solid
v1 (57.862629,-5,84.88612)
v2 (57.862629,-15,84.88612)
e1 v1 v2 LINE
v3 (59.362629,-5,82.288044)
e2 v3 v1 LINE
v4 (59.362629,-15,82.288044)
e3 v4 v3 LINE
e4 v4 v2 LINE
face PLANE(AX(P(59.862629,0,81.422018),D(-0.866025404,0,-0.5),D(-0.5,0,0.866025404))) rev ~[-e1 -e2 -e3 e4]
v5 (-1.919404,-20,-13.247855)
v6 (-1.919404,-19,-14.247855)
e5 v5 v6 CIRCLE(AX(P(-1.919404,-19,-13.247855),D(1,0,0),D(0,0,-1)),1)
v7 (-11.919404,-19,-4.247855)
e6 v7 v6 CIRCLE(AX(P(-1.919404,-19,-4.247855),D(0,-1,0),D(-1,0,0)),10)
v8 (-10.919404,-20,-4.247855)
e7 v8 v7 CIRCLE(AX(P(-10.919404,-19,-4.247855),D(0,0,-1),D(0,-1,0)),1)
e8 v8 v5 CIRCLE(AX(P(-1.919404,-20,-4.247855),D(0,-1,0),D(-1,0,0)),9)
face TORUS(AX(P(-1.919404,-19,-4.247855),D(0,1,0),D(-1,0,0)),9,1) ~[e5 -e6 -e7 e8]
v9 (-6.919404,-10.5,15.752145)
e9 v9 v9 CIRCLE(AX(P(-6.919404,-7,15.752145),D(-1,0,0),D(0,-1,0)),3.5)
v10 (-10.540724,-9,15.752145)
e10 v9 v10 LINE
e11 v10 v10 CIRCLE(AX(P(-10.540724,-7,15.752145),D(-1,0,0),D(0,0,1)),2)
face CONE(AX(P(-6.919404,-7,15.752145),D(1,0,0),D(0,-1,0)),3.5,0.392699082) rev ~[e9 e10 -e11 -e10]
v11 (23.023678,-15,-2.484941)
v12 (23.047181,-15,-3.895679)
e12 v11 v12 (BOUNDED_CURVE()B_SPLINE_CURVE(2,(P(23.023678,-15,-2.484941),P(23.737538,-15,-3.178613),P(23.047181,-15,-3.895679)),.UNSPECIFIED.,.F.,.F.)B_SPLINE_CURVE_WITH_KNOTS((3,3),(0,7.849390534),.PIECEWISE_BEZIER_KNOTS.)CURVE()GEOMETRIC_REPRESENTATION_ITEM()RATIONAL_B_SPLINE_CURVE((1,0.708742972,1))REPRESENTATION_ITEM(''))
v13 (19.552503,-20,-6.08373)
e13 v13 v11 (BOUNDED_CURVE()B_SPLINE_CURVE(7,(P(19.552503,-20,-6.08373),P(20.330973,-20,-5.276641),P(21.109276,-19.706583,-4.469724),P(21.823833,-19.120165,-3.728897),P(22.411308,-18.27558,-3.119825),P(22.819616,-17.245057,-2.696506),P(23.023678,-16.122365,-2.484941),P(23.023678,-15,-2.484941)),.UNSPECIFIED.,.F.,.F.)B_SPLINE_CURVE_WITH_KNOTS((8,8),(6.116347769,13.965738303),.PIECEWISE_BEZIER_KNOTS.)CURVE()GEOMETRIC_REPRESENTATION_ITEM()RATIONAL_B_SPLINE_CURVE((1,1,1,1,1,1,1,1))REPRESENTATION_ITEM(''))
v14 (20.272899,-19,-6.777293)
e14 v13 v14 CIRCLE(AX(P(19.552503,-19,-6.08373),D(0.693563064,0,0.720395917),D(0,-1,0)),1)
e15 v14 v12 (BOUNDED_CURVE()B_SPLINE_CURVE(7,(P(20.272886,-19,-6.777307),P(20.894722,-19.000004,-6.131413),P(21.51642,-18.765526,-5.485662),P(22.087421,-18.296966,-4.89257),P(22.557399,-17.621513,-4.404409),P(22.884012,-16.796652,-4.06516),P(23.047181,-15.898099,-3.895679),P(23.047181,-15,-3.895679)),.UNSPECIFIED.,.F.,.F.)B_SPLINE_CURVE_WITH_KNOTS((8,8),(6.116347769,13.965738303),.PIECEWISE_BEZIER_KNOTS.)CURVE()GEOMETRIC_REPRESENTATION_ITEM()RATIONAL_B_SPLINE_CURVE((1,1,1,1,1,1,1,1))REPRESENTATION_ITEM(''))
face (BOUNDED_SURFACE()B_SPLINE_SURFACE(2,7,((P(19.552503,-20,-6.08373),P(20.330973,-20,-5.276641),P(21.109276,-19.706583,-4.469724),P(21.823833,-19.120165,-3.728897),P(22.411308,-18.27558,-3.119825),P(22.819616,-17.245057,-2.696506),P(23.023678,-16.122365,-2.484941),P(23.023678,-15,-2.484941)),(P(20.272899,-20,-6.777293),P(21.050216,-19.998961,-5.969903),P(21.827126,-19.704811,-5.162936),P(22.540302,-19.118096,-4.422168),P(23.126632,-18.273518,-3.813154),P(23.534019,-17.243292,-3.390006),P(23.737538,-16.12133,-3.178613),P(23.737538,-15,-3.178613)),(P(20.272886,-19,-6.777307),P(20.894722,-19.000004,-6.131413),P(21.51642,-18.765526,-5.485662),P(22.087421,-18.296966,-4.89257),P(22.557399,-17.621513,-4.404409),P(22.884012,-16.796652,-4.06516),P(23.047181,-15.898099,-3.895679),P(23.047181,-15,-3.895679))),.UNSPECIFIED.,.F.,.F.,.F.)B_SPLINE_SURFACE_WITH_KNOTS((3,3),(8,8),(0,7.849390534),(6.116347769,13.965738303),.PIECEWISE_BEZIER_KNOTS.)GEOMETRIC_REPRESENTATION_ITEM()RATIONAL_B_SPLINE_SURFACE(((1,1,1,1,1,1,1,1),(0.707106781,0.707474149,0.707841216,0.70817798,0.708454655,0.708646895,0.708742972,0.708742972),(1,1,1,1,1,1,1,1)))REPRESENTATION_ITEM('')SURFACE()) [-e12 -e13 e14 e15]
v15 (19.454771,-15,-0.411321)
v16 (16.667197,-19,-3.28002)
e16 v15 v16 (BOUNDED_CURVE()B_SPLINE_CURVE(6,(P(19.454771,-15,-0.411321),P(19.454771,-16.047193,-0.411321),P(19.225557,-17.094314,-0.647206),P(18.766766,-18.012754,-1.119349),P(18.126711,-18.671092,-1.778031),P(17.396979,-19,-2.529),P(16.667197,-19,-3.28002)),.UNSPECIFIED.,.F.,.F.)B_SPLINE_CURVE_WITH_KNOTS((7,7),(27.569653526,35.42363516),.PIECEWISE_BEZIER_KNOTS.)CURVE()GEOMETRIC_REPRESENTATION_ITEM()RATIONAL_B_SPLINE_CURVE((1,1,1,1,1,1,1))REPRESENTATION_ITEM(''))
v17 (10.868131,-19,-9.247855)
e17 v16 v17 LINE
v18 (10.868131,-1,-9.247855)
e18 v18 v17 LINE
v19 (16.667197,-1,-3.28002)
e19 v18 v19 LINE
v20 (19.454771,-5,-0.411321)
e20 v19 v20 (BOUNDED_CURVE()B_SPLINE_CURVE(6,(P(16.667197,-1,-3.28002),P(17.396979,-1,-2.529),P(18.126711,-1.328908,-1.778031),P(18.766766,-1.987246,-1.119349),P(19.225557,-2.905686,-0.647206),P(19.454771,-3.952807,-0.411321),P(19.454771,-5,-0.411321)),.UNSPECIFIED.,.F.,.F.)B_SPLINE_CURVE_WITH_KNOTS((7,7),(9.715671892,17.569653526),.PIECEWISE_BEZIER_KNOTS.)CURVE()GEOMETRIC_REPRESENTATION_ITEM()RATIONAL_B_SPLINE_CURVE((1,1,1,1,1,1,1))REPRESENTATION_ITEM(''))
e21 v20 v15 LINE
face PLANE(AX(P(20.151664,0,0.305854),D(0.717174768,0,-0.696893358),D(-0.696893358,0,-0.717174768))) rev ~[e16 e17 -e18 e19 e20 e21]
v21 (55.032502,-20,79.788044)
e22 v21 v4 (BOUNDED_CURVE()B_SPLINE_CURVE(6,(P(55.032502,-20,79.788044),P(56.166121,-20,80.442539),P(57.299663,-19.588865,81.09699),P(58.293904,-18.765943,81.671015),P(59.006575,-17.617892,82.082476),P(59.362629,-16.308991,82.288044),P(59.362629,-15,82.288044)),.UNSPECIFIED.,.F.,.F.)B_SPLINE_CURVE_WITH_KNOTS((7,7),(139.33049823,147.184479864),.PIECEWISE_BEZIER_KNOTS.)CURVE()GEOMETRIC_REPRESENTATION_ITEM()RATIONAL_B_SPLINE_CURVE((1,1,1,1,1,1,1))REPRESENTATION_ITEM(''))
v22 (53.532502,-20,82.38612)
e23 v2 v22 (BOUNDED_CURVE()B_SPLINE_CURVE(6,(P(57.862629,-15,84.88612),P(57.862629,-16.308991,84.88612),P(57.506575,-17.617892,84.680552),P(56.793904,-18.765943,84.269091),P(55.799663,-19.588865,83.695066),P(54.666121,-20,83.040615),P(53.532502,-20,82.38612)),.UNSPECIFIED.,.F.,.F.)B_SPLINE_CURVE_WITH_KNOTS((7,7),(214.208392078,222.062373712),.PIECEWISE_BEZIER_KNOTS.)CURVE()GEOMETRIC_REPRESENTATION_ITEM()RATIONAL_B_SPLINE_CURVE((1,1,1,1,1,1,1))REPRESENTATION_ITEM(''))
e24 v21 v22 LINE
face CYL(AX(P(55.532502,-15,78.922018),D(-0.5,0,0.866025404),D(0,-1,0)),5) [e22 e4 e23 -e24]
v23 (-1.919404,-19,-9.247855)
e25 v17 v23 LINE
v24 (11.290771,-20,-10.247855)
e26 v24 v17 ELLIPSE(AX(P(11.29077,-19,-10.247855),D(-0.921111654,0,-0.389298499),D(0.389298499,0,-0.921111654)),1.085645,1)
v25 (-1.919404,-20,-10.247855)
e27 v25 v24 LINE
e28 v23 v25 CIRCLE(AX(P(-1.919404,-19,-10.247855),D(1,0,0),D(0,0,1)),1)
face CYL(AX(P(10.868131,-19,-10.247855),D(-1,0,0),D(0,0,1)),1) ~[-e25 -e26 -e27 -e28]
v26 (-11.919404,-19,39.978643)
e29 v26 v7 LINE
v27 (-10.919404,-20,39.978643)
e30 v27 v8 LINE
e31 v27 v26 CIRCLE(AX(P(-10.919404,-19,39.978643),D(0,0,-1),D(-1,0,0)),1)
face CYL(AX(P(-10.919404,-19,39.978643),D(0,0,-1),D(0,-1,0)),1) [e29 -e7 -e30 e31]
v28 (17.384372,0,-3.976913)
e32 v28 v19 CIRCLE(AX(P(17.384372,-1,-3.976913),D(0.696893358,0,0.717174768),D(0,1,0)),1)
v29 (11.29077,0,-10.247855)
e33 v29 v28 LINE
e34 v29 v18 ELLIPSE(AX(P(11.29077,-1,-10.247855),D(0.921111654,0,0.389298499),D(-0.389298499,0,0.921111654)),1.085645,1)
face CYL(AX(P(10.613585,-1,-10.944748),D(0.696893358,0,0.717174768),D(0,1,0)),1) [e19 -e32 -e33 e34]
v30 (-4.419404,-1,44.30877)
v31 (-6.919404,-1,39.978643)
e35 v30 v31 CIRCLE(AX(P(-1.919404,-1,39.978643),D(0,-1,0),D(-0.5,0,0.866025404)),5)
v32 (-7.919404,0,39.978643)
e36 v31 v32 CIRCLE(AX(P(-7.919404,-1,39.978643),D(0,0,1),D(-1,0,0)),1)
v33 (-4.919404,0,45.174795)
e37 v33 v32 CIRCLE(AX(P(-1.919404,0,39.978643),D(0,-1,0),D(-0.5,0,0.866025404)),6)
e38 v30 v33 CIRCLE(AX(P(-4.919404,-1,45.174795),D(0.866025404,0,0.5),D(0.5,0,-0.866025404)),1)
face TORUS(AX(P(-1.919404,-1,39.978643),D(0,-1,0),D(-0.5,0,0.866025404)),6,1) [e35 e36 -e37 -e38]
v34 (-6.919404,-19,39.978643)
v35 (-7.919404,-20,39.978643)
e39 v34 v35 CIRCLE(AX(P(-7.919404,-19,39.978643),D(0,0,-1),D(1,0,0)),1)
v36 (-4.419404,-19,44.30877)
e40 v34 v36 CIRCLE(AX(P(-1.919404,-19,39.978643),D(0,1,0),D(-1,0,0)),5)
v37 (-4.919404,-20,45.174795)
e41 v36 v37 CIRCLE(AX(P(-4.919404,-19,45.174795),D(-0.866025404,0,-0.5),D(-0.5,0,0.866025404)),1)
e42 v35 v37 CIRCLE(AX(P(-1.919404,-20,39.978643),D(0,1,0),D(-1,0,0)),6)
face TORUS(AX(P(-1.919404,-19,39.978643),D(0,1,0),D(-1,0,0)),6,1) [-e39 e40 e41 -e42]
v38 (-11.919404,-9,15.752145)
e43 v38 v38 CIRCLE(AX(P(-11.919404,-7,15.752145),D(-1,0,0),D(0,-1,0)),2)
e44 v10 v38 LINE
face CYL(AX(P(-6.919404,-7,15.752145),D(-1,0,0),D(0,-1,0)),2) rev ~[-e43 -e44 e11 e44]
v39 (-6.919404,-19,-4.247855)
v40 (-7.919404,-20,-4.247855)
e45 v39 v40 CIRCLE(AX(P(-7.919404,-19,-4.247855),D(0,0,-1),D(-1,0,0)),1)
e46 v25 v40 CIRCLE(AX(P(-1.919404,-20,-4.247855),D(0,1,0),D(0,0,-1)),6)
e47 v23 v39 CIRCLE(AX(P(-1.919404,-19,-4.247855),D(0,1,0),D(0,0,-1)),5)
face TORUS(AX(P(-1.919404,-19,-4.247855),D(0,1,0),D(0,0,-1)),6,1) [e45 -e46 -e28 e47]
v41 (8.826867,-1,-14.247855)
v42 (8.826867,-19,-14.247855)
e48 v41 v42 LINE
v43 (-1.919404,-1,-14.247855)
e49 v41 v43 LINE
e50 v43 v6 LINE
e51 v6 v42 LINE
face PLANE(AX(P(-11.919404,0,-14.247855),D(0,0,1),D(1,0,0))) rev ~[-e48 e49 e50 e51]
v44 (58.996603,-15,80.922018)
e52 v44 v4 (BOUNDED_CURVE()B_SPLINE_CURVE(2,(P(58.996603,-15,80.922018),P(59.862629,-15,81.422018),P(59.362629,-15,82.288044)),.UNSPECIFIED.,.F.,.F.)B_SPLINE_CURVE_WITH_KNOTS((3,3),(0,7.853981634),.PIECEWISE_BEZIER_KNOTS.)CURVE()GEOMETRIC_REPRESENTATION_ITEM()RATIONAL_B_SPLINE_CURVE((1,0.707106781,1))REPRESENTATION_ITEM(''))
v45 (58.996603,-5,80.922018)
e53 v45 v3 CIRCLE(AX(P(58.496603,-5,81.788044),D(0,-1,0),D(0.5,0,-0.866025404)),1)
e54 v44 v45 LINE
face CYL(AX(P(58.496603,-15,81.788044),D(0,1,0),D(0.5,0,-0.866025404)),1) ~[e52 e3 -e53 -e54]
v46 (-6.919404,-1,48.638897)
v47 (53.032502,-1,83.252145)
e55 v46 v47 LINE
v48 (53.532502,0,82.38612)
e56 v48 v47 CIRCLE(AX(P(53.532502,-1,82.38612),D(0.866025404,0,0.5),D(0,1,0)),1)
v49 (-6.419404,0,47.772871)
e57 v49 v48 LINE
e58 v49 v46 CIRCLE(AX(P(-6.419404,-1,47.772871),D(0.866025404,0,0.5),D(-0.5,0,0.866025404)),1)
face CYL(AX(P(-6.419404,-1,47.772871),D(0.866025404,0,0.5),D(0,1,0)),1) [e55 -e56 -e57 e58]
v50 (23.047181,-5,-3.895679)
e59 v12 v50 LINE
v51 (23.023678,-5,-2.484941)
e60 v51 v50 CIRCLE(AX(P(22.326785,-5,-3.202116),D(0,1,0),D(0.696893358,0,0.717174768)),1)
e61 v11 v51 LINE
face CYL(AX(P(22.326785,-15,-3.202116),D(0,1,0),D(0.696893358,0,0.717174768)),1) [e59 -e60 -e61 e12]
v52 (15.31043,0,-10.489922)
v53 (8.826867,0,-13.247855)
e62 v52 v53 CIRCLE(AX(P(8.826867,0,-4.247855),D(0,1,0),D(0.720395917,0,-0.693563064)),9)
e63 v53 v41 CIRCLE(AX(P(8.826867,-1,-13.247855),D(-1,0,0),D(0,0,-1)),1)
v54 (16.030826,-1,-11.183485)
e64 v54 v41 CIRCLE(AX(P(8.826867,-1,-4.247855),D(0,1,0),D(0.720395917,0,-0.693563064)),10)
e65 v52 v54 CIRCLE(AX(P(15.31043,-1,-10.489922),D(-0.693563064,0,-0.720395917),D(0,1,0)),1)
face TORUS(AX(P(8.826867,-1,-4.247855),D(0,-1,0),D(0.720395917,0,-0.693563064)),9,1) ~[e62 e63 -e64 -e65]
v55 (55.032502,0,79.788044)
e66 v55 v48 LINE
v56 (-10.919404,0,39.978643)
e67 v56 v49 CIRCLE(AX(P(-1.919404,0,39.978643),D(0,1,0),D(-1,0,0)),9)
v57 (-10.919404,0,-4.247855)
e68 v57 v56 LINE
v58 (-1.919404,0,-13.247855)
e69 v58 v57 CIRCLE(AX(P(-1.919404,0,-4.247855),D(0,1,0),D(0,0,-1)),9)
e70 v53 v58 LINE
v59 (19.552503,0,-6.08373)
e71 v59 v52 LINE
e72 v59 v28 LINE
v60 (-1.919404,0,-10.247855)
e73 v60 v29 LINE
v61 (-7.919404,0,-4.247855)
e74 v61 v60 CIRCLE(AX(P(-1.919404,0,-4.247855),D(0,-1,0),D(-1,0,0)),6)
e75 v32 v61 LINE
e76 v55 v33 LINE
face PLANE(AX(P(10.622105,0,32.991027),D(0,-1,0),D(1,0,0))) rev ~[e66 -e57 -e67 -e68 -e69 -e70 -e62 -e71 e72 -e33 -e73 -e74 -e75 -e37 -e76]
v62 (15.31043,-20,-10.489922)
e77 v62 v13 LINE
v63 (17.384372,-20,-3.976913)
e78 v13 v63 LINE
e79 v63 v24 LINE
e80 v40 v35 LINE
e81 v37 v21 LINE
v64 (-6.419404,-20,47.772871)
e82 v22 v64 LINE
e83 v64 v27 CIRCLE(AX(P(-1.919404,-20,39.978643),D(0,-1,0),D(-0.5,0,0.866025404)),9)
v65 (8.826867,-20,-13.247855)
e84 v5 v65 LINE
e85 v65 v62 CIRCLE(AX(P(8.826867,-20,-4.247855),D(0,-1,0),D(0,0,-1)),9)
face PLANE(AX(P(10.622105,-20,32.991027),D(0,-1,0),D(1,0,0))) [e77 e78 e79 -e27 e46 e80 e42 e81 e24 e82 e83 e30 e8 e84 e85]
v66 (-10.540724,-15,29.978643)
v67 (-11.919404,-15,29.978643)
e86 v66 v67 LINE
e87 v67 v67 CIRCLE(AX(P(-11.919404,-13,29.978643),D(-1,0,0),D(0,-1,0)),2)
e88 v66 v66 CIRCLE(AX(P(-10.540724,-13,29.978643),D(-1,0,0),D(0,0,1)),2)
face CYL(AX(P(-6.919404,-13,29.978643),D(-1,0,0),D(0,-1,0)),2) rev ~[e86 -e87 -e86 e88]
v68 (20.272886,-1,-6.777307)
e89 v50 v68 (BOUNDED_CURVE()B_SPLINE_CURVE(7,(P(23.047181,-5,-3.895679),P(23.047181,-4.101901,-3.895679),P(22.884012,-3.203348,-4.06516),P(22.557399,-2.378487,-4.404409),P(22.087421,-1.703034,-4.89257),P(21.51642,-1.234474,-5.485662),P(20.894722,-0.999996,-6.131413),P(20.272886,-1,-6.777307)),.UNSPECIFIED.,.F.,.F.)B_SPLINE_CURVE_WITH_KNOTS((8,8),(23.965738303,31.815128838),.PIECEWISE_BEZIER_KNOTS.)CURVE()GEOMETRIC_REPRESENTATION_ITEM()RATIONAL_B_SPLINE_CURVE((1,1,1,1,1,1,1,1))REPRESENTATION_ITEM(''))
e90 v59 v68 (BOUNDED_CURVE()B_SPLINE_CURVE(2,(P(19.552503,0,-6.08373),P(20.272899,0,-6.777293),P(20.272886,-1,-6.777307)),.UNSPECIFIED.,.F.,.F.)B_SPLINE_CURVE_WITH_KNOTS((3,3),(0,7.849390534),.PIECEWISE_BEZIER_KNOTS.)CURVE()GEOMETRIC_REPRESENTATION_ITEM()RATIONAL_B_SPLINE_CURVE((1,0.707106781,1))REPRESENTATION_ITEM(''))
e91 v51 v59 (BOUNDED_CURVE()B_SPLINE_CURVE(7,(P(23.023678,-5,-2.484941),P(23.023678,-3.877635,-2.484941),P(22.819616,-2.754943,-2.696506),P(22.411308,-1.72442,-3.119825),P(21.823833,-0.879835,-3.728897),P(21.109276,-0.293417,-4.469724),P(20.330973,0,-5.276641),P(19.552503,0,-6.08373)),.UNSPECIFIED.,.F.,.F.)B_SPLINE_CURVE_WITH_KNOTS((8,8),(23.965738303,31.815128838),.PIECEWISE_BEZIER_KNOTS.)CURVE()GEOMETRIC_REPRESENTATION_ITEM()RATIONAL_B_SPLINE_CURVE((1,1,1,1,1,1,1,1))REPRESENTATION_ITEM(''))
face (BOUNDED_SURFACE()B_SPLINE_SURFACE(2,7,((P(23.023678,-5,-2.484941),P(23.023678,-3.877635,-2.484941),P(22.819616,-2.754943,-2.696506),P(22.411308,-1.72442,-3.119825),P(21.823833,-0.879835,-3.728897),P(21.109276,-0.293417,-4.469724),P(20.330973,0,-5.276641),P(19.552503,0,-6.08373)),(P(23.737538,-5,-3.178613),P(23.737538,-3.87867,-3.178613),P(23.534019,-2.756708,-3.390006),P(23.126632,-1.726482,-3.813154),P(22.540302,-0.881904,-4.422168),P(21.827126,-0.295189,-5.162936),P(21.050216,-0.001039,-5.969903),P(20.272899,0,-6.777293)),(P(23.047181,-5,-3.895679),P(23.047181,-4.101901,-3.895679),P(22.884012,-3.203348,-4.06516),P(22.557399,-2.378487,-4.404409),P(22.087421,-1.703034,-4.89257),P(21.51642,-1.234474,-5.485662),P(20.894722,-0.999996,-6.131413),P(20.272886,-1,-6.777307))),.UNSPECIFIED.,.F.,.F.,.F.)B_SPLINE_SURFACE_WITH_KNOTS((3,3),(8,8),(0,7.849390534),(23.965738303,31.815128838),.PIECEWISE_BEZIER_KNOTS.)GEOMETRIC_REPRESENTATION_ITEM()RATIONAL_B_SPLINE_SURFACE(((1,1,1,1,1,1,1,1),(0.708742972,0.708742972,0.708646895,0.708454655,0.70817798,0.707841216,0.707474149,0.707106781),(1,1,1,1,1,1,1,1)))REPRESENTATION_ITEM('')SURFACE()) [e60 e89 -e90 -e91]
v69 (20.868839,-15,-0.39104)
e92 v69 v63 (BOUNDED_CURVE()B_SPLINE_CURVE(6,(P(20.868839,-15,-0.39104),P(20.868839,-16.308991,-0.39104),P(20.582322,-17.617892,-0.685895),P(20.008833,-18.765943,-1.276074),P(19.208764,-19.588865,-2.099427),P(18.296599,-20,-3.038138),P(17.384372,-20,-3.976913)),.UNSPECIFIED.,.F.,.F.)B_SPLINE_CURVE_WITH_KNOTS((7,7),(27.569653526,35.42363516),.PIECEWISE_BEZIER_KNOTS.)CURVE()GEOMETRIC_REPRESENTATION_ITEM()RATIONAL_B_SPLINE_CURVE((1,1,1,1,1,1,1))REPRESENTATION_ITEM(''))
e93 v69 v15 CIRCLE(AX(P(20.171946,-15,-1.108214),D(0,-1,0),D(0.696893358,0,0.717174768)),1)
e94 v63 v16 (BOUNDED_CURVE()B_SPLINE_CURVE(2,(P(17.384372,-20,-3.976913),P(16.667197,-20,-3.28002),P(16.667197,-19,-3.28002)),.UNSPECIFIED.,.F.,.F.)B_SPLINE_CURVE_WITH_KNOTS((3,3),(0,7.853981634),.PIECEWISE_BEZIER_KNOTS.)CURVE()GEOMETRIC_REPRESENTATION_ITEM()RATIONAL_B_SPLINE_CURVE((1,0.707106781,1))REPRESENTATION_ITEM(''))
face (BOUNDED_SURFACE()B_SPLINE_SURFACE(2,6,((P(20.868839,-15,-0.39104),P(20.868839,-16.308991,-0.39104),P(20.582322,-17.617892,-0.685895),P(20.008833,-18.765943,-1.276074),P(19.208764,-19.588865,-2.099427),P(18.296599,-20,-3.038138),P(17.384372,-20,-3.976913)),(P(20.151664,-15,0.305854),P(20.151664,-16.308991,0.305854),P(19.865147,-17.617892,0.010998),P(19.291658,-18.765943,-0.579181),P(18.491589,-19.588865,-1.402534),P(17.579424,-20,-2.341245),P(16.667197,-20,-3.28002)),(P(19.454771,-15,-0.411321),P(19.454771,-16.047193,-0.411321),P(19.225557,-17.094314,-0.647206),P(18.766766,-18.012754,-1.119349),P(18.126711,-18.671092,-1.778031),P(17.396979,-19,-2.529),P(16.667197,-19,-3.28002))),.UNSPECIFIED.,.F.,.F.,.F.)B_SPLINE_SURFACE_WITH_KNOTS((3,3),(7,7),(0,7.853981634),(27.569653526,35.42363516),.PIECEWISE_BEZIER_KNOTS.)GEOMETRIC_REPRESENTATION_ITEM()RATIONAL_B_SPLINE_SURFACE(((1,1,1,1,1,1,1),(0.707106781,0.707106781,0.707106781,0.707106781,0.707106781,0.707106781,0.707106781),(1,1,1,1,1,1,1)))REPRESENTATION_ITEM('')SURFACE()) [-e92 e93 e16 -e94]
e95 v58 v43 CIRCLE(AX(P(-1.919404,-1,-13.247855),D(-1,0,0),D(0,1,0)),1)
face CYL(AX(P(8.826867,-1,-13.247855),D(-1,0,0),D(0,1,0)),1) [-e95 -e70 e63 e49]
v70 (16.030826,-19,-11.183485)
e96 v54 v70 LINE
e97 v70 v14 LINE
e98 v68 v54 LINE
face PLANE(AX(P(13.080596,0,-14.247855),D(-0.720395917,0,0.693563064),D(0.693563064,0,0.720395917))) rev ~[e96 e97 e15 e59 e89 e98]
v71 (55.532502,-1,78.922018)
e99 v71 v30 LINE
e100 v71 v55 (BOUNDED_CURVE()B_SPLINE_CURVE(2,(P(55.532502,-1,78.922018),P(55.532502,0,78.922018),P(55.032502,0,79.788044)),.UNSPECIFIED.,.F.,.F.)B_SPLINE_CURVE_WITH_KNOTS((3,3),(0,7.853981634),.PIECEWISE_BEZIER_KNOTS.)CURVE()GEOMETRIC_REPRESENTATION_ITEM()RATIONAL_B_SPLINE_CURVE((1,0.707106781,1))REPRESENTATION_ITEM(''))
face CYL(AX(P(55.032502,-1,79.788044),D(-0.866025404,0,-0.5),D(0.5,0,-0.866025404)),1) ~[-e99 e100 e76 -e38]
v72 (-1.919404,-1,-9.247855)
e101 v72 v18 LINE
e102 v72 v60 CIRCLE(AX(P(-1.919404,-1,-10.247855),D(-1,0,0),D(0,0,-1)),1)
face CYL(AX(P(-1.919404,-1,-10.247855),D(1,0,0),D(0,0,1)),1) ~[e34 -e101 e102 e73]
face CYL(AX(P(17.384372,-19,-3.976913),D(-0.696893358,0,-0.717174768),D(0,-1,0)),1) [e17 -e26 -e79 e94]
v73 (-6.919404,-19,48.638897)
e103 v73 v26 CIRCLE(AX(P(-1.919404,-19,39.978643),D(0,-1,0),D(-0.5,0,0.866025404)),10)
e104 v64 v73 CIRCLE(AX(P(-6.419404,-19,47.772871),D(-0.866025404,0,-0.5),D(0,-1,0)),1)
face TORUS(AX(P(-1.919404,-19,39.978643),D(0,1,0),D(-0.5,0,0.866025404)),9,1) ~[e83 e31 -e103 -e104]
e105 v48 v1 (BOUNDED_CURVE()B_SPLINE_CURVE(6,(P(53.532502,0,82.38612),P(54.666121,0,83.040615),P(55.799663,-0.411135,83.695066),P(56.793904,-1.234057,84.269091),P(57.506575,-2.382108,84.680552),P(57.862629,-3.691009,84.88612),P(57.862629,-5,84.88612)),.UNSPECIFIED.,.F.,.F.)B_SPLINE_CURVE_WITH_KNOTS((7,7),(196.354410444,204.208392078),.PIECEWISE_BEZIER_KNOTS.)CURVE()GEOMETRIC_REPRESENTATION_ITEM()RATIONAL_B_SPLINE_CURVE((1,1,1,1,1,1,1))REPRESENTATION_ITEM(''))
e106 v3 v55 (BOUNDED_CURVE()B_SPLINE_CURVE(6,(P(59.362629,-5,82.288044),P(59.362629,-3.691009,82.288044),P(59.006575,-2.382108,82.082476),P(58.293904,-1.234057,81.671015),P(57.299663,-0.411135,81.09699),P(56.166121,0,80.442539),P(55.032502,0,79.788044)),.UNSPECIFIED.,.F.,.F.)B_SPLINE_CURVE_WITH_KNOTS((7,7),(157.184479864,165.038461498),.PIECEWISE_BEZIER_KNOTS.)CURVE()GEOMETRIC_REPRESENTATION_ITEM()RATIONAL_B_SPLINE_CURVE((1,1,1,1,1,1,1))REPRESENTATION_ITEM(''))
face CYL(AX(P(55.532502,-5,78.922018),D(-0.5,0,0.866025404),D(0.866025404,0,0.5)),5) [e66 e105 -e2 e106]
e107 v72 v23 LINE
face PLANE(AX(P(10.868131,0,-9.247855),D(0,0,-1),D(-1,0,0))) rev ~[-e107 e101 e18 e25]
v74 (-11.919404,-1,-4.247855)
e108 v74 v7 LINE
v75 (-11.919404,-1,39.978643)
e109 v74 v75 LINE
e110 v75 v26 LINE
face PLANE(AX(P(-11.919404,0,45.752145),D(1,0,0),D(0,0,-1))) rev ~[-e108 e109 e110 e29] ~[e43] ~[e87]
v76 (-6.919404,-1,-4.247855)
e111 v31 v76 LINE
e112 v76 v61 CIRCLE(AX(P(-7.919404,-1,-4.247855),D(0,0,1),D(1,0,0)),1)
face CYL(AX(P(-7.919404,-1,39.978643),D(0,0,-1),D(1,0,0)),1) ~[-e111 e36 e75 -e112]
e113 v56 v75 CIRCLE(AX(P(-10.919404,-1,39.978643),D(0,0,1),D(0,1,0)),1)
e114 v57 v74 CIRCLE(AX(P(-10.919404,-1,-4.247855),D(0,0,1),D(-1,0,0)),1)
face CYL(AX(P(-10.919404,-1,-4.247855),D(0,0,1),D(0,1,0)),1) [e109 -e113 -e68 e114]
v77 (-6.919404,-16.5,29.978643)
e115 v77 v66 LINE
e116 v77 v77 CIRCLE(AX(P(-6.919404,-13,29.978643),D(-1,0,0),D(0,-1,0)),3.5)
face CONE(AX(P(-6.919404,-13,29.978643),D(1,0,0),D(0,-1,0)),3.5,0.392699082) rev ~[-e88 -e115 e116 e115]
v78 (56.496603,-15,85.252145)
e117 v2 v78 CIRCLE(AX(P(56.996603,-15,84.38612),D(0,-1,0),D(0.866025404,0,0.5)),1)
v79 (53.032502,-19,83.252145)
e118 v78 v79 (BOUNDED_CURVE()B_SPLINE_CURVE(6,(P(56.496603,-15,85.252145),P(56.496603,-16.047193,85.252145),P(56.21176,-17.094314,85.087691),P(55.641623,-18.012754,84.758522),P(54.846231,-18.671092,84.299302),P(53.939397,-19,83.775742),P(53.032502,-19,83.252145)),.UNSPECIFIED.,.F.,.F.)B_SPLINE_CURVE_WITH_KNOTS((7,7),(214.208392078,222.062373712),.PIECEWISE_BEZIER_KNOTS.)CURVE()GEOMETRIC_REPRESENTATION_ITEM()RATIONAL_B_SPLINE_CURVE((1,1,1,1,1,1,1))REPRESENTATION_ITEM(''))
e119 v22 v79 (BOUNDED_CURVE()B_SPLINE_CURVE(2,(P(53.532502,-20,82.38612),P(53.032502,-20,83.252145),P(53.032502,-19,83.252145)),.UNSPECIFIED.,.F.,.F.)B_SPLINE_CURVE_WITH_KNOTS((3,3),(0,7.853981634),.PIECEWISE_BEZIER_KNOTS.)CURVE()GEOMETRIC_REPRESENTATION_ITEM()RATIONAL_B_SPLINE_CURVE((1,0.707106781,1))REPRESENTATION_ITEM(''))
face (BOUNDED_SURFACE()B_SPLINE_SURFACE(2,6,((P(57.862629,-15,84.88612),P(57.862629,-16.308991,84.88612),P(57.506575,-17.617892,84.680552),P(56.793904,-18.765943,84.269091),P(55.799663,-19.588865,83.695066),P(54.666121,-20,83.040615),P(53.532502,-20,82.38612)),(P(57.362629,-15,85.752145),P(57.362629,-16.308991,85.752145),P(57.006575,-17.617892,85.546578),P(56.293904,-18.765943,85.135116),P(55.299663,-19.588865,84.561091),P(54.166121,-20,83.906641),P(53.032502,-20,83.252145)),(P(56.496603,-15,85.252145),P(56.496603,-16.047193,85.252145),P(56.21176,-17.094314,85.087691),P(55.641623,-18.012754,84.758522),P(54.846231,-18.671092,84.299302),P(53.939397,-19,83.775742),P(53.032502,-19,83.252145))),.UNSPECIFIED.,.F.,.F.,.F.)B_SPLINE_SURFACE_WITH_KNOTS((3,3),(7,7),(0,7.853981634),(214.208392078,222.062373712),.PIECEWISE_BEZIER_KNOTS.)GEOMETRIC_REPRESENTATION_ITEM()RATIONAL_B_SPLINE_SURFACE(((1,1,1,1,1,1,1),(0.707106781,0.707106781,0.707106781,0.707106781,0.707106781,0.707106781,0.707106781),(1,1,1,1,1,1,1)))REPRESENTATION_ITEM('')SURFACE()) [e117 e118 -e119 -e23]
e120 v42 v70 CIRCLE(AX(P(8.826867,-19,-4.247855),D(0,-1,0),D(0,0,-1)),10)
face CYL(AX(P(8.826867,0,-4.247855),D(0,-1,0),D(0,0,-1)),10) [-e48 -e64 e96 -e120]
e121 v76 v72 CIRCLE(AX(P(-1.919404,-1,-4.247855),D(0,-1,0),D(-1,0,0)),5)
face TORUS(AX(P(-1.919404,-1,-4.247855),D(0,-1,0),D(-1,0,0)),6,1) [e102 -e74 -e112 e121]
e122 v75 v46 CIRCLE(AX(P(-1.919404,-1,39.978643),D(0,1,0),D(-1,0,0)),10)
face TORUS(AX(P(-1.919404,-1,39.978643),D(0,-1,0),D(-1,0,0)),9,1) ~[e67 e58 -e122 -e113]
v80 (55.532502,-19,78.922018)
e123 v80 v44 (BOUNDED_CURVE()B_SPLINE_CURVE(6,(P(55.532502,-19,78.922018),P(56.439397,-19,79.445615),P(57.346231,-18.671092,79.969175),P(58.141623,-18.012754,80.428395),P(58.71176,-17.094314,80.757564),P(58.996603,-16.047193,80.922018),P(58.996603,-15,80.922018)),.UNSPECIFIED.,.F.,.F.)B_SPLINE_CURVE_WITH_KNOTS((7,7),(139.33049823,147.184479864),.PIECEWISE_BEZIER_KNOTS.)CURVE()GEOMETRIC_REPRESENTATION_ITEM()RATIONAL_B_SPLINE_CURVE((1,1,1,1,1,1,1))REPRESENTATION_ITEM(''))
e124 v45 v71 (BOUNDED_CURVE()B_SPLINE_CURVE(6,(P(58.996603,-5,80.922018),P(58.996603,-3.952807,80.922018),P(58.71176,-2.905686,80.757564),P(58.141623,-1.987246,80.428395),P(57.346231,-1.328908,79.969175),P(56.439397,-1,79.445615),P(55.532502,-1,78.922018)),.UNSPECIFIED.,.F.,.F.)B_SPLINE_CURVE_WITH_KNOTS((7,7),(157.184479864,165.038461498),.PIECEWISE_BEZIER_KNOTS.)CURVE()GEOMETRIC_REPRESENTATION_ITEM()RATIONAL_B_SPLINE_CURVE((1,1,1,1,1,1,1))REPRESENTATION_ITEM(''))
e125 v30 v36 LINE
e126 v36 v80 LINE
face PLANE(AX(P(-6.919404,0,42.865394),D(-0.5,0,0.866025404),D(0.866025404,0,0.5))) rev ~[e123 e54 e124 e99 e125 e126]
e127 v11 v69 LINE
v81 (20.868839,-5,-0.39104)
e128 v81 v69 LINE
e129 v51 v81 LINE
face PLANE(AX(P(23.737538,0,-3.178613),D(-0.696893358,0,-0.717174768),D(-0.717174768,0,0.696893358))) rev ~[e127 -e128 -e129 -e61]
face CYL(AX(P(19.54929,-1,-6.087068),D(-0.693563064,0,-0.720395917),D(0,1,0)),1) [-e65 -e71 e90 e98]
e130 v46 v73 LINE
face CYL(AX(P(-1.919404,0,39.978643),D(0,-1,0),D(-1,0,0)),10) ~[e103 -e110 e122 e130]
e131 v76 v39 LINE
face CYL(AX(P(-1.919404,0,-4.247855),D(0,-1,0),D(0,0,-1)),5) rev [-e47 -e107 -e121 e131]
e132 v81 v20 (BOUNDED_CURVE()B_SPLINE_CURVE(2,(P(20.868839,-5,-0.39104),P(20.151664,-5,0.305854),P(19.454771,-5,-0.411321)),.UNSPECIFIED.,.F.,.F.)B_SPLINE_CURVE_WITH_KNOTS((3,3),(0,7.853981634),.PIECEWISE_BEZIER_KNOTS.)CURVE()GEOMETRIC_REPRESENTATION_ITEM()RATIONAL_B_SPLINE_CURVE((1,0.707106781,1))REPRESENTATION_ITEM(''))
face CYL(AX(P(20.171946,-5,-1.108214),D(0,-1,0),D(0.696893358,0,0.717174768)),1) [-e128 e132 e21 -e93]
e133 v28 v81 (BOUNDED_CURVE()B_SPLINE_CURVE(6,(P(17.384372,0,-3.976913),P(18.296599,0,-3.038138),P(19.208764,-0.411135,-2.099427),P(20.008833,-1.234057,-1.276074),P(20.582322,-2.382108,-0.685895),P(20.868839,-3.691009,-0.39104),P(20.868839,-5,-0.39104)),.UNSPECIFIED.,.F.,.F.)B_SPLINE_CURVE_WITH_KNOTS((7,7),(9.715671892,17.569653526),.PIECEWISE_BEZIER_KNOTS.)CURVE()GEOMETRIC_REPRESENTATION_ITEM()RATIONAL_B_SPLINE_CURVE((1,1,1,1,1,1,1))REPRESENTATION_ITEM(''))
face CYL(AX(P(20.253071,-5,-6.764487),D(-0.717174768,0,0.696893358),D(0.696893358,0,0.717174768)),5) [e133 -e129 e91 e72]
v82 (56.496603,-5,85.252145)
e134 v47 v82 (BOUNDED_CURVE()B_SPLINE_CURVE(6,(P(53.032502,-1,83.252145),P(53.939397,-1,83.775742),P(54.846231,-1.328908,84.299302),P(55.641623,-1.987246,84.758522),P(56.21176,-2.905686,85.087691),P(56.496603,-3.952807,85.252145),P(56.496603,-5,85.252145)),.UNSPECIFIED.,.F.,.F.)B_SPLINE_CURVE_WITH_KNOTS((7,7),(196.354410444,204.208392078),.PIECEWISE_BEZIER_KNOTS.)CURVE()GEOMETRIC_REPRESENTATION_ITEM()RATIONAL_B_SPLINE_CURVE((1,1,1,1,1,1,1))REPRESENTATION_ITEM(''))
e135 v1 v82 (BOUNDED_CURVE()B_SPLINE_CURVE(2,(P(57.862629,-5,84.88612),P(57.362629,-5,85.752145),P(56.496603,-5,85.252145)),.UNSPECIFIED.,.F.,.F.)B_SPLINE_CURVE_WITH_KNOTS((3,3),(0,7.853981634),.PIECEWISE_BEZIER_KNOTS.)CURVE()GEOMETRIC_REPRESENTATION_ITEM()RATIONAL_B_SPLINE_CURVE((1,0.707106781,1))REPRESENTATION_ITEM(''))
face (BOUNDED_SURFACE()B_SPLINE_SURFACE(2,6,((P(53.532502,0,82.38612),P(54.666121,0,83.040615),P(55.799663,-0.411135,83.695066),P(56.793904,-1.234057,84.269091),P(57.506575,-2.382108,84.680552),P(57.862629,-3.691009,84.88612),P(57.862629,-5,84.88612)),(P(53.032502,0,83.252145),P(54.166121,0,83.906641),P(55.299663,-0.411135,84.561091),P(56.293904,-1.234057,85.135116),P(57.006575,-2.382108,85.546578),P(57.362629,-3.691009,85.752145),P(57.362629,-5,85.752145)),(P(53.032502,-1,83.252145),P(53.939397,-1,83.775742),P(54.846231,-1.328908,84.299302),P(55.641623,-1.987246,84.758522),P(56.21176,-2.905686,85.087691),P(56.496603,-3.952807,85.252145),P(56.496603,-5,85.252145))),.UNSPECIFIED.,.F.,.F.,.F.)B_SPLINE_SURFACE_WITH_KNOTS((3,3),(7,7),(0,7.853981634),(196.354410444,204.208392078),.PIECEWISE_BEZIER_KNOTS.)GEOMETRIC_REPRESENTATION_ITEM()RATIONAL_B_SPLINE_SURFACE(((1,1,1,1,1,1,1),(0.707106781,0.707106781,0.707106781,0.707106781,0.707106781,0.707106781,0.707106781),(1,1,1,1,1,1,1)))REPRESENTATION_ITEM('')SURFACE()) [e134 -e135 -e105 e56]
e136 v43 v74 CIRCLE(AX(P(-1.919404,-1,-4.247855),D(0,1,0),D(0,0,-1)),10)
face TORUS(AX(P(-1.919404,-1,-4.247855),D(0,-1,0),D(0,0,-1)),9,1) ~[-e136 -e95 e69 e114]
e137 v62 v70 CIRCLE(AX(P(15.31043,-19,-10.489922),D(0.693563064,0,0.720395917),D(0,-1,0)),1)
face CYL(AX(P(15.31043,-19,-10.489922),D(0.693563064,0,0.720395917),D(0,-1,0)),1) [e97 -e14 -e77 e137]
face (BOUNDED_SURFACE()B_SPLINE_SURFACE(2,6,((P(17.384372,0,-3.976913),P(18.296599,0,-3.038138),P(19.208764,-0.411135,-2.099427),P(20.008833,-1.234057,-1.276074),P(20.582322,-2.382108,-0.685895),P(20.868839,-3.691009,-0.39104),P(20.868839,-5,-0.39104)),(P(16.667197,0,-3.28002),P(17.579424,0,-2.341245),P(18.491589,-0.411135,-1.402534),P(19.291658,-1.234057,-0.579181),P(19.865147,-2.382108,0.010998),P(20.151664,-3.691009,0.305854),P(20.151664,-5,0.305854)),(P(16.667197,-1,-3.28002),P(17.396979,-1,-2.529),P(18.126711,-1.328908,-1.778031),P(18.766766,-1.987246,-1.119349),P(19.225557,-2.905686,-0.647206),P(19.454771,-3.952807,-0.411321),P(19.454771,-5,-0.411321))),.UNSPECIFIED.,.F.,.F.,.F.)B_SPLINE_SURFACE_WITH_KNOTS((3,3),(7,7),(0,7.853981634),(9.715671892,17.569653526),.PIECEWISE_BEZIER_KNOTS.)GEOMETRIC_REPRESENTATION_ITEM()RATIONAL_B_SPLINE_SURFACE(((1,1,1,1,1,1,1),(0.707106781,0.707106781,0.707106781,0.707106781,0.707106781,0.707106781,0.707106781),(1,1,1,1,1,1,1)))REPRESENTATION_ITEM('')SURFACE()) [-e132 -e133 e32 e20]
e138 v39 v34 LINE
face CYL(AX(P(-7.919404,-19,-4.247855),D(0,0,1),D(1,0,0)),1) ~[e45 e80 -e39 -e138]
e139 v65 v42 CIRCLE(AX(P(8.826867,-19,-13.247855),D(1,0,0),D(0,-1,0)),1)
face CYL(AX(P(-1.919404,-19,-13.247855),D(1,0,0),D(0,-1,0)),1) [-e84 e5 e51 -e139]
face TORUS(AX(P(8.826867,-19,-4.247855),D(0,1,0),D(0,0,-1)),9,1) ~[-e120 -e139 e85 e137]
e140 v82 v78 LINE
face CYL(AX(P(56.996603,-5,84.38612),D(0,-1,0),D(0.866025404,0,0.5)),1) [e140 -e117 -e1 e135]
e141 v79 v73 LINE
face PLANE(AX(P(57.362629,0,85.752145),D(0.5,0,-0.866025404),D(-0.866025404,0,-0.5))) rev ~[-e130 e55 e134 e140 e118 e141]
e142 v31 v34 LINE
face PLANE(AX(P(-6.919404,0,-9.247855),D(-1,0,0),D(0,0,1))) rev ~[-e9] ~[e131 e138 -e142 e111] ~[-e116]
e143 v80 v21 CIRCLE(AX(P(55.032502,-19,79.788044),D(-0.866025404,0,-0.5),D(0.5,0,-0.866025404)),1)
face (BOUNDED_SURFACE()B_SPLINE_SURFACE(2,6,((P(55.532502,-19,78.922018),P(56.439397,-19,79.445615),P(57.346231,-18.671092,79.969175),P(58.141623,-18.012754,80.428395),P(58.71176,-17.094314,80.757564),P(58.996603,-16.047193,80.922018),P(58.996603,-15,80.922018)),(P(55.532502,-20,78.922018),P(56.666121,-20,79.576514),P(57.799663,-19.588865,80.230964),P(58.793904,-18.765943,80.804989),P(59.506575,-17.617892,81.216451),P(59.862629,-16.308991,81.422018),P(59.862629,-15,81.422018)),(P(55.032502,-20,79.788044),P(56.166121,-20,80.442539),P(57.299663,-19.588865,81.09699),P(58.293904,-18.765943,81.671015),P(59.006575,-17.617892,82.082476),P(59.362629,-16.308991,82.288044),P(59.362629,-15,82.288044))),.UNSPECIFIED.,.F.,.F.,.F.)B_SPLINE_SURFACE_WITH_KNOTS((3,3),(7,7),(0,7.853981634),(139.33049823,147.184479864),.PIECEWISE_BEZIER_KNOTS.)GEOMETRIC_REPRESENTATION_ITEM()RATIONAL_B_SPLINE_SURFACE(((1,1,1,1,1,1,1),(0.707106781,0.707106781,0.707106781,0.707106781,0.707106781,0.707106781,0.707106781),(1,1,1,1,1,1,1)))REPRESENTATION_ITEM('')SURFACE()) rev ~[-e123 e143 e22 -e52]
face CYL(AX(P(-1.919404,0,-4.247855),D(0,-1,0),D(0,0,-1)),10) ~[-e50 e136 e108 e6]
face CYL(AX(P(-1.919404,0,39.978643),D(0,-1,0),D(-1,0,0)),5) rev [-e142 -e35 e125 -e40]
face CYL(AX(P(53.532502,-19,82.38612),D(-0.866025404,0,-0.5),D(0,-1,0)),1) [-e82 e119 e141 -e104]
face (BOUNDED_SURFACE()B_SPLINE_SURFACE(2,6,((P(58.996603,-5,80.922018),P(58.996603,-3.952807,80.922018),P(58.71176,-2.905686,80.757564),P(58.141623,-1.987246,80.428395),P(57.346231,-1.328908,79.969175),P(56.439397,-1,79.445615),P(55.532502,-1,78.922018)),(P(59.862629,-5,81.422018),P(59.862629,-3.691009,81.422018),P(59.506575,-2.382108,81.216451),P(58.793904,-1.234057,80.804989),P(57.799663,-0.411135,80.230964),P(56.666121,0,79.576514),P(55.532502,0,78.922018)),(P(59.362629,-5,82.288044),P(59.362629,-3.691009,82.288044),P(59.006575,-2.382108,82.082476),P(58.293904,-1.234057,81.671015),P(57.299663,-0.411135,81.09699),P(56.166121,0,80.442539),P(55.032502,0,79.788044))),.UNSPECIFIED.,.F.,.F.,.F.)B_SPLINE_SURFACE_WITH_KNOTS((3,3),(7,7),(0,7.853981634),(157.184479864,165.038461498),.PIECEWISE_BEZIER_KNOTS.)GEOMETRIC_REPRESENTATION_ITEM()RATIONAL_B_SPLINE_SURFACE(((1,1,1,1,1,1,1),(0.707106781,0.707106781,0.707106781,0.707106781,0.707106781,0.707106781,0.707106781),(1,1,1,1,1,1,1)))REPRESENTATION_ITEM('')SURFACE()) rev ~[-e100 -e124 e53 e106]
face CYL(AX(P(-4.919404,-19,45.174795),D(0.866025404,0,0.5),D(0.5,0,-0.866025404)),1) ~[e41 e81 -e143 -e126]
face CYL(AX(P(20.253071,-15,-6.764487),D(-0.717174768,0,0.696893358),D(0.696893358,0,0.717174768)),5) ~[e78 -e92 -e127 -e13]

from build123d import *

# Parameters (mm, degrees)
F1_DEPTH        = 20
F2_R            = 10
F3_R            = 10
F5_R            = 5
F6_R            = 5
F7_R            = 5
F8_R            = 5
F9_R            = 5
F10_R           = 5
F11_R           = 1
F12_R           = 1
F13_R           = 1
F15_D           = 4
F15_CSINK_D     = 7
F15_CSINK_ANGLE = 45
F17_D           = 4
F17_CSINK_D     = 7
F17_CSINK_ANGLE = 45


# Not quite as in the source:
# - two fillets or chamfers of one size are made in one step


with BuildPart() as f1:
    # F0 (on Front) → F1 (new body)
    with BuildSketch(Plane.XZ):
        Polygon((-11.9194036352, -14.2478547741), (13.0805963648, -14.2478547741), (23.7375380173, -3.1786129853), (20.1516641766, 0.305853803), (10.8681305885, -9.2478547741), (-6.9194036352, -9.2478547741), (-6.9194036352, 42.86539388), (59.8626286675, 81.422018207), (57.3626286675, 85.7521452259), (-11.9194036352, 45.7521452259), align=None)
    extrude(amount=F1_DEPTH)

    # F2
    f2_edges = [f1.edges().sort_by_distance(p)[0] for p in [
        (-11.919404, -10, -14.247855),
    ]]
    fillet(f2_edges, radius=F2_R)

    # F3
    f3_edges = [f1.edges().sort_by_distance(p)[0] for p in [
        (-11.919404, -10, 45.752145),
        (13.080596, -10, -14.247855),
    ]]
    fillet(f3_edges, radius=F3_R)

    # F5
    f5_edges = [f1.edges().sort_by_distance(p)[0] for p in [
        (-6.919404, -10, -9.247855),
    ]]
    fillet(f5_edges, radius=F5_R)

    # F6
    f6_edges = [f1.edges().sort_by_distance(p)[0] for p in [
        (-6.919404, -10, 42.865394),
    ]]
    fillet(f6_edges, radius=F6_R)

    # F7
    f7_edges = [f1.edges().sort_by_distance(p)[0] for p in [
        (21.944601, -20, -1.43638),
    ]]
    fillet(f7_edges, radius=F7_R)

    # F8
    f8_edges = [f1.edges().sort_by_distance(p)[0] for p in [
        (21.944601, 0, -1.43638),
    ]]
    fillet(f8_edges, radius=F8_R)

    # F9
    f9_edges = [f1.edges().sort_by_distance(p)[0] for p in [
        (58.612629, -20, 83.587082),
    ]]
    fillet(f9_edges, radius=F9_R)

    # F10
    f10_edges = [f1.edges().sort_by_distance(p)[0] for p in [
        (58.612629, 0, 83.587082),
    ]]
    fillet(f10_edges, radius=F10_R)

    # F11
    f11_edges = [f1.edges().sort_by_distance(p)[0] for p in [
        (25.556549, -20, 61.615394),
    ]]
    fillet(f11_edges, radius=F11_R)

    # F12
    f12_edges = [f1.edges().sort_by_distance(p)[0] for p in [
        (18.150256, -20, -8.982058),
    ]]
    fillet(f12_edges, radius=F12_R)

    # F13
    f13_edges = [f1.edges().sort_by_distance(p)[0] for p in [
        (13.767664, -20, -6.263937),
        (13.767664, 0, -6.263937),
        (19.131087, -1.464466, -0.744424),
        (19.131087, -18.535534, -0.744424),
        (20.151664, -10, 0.305854),
    ]]
    fillet(f13_edges, radius=F13_R)

    # F15 (through all)
    with Locations(Plane.YZ.offset(-6.9194036352)):
        with Locations((-13, 29.978642534)):
            CounterSinkHole(F15_D / 2, F15_CSINK_D / 2, counter_sink_angle=F15_CSINK_ANGLE)

    # F17 (through all)
    with Locations(Plane.YZ.offset(-6.9194036352)):
        with Locations((-7, 15.7521452259)):
            CounterSinkHole(F17_D / 2, F17_CSINK_D / 2, counter_sink_angle=F17_CSINK_ANGLE)


solid = f1.part
